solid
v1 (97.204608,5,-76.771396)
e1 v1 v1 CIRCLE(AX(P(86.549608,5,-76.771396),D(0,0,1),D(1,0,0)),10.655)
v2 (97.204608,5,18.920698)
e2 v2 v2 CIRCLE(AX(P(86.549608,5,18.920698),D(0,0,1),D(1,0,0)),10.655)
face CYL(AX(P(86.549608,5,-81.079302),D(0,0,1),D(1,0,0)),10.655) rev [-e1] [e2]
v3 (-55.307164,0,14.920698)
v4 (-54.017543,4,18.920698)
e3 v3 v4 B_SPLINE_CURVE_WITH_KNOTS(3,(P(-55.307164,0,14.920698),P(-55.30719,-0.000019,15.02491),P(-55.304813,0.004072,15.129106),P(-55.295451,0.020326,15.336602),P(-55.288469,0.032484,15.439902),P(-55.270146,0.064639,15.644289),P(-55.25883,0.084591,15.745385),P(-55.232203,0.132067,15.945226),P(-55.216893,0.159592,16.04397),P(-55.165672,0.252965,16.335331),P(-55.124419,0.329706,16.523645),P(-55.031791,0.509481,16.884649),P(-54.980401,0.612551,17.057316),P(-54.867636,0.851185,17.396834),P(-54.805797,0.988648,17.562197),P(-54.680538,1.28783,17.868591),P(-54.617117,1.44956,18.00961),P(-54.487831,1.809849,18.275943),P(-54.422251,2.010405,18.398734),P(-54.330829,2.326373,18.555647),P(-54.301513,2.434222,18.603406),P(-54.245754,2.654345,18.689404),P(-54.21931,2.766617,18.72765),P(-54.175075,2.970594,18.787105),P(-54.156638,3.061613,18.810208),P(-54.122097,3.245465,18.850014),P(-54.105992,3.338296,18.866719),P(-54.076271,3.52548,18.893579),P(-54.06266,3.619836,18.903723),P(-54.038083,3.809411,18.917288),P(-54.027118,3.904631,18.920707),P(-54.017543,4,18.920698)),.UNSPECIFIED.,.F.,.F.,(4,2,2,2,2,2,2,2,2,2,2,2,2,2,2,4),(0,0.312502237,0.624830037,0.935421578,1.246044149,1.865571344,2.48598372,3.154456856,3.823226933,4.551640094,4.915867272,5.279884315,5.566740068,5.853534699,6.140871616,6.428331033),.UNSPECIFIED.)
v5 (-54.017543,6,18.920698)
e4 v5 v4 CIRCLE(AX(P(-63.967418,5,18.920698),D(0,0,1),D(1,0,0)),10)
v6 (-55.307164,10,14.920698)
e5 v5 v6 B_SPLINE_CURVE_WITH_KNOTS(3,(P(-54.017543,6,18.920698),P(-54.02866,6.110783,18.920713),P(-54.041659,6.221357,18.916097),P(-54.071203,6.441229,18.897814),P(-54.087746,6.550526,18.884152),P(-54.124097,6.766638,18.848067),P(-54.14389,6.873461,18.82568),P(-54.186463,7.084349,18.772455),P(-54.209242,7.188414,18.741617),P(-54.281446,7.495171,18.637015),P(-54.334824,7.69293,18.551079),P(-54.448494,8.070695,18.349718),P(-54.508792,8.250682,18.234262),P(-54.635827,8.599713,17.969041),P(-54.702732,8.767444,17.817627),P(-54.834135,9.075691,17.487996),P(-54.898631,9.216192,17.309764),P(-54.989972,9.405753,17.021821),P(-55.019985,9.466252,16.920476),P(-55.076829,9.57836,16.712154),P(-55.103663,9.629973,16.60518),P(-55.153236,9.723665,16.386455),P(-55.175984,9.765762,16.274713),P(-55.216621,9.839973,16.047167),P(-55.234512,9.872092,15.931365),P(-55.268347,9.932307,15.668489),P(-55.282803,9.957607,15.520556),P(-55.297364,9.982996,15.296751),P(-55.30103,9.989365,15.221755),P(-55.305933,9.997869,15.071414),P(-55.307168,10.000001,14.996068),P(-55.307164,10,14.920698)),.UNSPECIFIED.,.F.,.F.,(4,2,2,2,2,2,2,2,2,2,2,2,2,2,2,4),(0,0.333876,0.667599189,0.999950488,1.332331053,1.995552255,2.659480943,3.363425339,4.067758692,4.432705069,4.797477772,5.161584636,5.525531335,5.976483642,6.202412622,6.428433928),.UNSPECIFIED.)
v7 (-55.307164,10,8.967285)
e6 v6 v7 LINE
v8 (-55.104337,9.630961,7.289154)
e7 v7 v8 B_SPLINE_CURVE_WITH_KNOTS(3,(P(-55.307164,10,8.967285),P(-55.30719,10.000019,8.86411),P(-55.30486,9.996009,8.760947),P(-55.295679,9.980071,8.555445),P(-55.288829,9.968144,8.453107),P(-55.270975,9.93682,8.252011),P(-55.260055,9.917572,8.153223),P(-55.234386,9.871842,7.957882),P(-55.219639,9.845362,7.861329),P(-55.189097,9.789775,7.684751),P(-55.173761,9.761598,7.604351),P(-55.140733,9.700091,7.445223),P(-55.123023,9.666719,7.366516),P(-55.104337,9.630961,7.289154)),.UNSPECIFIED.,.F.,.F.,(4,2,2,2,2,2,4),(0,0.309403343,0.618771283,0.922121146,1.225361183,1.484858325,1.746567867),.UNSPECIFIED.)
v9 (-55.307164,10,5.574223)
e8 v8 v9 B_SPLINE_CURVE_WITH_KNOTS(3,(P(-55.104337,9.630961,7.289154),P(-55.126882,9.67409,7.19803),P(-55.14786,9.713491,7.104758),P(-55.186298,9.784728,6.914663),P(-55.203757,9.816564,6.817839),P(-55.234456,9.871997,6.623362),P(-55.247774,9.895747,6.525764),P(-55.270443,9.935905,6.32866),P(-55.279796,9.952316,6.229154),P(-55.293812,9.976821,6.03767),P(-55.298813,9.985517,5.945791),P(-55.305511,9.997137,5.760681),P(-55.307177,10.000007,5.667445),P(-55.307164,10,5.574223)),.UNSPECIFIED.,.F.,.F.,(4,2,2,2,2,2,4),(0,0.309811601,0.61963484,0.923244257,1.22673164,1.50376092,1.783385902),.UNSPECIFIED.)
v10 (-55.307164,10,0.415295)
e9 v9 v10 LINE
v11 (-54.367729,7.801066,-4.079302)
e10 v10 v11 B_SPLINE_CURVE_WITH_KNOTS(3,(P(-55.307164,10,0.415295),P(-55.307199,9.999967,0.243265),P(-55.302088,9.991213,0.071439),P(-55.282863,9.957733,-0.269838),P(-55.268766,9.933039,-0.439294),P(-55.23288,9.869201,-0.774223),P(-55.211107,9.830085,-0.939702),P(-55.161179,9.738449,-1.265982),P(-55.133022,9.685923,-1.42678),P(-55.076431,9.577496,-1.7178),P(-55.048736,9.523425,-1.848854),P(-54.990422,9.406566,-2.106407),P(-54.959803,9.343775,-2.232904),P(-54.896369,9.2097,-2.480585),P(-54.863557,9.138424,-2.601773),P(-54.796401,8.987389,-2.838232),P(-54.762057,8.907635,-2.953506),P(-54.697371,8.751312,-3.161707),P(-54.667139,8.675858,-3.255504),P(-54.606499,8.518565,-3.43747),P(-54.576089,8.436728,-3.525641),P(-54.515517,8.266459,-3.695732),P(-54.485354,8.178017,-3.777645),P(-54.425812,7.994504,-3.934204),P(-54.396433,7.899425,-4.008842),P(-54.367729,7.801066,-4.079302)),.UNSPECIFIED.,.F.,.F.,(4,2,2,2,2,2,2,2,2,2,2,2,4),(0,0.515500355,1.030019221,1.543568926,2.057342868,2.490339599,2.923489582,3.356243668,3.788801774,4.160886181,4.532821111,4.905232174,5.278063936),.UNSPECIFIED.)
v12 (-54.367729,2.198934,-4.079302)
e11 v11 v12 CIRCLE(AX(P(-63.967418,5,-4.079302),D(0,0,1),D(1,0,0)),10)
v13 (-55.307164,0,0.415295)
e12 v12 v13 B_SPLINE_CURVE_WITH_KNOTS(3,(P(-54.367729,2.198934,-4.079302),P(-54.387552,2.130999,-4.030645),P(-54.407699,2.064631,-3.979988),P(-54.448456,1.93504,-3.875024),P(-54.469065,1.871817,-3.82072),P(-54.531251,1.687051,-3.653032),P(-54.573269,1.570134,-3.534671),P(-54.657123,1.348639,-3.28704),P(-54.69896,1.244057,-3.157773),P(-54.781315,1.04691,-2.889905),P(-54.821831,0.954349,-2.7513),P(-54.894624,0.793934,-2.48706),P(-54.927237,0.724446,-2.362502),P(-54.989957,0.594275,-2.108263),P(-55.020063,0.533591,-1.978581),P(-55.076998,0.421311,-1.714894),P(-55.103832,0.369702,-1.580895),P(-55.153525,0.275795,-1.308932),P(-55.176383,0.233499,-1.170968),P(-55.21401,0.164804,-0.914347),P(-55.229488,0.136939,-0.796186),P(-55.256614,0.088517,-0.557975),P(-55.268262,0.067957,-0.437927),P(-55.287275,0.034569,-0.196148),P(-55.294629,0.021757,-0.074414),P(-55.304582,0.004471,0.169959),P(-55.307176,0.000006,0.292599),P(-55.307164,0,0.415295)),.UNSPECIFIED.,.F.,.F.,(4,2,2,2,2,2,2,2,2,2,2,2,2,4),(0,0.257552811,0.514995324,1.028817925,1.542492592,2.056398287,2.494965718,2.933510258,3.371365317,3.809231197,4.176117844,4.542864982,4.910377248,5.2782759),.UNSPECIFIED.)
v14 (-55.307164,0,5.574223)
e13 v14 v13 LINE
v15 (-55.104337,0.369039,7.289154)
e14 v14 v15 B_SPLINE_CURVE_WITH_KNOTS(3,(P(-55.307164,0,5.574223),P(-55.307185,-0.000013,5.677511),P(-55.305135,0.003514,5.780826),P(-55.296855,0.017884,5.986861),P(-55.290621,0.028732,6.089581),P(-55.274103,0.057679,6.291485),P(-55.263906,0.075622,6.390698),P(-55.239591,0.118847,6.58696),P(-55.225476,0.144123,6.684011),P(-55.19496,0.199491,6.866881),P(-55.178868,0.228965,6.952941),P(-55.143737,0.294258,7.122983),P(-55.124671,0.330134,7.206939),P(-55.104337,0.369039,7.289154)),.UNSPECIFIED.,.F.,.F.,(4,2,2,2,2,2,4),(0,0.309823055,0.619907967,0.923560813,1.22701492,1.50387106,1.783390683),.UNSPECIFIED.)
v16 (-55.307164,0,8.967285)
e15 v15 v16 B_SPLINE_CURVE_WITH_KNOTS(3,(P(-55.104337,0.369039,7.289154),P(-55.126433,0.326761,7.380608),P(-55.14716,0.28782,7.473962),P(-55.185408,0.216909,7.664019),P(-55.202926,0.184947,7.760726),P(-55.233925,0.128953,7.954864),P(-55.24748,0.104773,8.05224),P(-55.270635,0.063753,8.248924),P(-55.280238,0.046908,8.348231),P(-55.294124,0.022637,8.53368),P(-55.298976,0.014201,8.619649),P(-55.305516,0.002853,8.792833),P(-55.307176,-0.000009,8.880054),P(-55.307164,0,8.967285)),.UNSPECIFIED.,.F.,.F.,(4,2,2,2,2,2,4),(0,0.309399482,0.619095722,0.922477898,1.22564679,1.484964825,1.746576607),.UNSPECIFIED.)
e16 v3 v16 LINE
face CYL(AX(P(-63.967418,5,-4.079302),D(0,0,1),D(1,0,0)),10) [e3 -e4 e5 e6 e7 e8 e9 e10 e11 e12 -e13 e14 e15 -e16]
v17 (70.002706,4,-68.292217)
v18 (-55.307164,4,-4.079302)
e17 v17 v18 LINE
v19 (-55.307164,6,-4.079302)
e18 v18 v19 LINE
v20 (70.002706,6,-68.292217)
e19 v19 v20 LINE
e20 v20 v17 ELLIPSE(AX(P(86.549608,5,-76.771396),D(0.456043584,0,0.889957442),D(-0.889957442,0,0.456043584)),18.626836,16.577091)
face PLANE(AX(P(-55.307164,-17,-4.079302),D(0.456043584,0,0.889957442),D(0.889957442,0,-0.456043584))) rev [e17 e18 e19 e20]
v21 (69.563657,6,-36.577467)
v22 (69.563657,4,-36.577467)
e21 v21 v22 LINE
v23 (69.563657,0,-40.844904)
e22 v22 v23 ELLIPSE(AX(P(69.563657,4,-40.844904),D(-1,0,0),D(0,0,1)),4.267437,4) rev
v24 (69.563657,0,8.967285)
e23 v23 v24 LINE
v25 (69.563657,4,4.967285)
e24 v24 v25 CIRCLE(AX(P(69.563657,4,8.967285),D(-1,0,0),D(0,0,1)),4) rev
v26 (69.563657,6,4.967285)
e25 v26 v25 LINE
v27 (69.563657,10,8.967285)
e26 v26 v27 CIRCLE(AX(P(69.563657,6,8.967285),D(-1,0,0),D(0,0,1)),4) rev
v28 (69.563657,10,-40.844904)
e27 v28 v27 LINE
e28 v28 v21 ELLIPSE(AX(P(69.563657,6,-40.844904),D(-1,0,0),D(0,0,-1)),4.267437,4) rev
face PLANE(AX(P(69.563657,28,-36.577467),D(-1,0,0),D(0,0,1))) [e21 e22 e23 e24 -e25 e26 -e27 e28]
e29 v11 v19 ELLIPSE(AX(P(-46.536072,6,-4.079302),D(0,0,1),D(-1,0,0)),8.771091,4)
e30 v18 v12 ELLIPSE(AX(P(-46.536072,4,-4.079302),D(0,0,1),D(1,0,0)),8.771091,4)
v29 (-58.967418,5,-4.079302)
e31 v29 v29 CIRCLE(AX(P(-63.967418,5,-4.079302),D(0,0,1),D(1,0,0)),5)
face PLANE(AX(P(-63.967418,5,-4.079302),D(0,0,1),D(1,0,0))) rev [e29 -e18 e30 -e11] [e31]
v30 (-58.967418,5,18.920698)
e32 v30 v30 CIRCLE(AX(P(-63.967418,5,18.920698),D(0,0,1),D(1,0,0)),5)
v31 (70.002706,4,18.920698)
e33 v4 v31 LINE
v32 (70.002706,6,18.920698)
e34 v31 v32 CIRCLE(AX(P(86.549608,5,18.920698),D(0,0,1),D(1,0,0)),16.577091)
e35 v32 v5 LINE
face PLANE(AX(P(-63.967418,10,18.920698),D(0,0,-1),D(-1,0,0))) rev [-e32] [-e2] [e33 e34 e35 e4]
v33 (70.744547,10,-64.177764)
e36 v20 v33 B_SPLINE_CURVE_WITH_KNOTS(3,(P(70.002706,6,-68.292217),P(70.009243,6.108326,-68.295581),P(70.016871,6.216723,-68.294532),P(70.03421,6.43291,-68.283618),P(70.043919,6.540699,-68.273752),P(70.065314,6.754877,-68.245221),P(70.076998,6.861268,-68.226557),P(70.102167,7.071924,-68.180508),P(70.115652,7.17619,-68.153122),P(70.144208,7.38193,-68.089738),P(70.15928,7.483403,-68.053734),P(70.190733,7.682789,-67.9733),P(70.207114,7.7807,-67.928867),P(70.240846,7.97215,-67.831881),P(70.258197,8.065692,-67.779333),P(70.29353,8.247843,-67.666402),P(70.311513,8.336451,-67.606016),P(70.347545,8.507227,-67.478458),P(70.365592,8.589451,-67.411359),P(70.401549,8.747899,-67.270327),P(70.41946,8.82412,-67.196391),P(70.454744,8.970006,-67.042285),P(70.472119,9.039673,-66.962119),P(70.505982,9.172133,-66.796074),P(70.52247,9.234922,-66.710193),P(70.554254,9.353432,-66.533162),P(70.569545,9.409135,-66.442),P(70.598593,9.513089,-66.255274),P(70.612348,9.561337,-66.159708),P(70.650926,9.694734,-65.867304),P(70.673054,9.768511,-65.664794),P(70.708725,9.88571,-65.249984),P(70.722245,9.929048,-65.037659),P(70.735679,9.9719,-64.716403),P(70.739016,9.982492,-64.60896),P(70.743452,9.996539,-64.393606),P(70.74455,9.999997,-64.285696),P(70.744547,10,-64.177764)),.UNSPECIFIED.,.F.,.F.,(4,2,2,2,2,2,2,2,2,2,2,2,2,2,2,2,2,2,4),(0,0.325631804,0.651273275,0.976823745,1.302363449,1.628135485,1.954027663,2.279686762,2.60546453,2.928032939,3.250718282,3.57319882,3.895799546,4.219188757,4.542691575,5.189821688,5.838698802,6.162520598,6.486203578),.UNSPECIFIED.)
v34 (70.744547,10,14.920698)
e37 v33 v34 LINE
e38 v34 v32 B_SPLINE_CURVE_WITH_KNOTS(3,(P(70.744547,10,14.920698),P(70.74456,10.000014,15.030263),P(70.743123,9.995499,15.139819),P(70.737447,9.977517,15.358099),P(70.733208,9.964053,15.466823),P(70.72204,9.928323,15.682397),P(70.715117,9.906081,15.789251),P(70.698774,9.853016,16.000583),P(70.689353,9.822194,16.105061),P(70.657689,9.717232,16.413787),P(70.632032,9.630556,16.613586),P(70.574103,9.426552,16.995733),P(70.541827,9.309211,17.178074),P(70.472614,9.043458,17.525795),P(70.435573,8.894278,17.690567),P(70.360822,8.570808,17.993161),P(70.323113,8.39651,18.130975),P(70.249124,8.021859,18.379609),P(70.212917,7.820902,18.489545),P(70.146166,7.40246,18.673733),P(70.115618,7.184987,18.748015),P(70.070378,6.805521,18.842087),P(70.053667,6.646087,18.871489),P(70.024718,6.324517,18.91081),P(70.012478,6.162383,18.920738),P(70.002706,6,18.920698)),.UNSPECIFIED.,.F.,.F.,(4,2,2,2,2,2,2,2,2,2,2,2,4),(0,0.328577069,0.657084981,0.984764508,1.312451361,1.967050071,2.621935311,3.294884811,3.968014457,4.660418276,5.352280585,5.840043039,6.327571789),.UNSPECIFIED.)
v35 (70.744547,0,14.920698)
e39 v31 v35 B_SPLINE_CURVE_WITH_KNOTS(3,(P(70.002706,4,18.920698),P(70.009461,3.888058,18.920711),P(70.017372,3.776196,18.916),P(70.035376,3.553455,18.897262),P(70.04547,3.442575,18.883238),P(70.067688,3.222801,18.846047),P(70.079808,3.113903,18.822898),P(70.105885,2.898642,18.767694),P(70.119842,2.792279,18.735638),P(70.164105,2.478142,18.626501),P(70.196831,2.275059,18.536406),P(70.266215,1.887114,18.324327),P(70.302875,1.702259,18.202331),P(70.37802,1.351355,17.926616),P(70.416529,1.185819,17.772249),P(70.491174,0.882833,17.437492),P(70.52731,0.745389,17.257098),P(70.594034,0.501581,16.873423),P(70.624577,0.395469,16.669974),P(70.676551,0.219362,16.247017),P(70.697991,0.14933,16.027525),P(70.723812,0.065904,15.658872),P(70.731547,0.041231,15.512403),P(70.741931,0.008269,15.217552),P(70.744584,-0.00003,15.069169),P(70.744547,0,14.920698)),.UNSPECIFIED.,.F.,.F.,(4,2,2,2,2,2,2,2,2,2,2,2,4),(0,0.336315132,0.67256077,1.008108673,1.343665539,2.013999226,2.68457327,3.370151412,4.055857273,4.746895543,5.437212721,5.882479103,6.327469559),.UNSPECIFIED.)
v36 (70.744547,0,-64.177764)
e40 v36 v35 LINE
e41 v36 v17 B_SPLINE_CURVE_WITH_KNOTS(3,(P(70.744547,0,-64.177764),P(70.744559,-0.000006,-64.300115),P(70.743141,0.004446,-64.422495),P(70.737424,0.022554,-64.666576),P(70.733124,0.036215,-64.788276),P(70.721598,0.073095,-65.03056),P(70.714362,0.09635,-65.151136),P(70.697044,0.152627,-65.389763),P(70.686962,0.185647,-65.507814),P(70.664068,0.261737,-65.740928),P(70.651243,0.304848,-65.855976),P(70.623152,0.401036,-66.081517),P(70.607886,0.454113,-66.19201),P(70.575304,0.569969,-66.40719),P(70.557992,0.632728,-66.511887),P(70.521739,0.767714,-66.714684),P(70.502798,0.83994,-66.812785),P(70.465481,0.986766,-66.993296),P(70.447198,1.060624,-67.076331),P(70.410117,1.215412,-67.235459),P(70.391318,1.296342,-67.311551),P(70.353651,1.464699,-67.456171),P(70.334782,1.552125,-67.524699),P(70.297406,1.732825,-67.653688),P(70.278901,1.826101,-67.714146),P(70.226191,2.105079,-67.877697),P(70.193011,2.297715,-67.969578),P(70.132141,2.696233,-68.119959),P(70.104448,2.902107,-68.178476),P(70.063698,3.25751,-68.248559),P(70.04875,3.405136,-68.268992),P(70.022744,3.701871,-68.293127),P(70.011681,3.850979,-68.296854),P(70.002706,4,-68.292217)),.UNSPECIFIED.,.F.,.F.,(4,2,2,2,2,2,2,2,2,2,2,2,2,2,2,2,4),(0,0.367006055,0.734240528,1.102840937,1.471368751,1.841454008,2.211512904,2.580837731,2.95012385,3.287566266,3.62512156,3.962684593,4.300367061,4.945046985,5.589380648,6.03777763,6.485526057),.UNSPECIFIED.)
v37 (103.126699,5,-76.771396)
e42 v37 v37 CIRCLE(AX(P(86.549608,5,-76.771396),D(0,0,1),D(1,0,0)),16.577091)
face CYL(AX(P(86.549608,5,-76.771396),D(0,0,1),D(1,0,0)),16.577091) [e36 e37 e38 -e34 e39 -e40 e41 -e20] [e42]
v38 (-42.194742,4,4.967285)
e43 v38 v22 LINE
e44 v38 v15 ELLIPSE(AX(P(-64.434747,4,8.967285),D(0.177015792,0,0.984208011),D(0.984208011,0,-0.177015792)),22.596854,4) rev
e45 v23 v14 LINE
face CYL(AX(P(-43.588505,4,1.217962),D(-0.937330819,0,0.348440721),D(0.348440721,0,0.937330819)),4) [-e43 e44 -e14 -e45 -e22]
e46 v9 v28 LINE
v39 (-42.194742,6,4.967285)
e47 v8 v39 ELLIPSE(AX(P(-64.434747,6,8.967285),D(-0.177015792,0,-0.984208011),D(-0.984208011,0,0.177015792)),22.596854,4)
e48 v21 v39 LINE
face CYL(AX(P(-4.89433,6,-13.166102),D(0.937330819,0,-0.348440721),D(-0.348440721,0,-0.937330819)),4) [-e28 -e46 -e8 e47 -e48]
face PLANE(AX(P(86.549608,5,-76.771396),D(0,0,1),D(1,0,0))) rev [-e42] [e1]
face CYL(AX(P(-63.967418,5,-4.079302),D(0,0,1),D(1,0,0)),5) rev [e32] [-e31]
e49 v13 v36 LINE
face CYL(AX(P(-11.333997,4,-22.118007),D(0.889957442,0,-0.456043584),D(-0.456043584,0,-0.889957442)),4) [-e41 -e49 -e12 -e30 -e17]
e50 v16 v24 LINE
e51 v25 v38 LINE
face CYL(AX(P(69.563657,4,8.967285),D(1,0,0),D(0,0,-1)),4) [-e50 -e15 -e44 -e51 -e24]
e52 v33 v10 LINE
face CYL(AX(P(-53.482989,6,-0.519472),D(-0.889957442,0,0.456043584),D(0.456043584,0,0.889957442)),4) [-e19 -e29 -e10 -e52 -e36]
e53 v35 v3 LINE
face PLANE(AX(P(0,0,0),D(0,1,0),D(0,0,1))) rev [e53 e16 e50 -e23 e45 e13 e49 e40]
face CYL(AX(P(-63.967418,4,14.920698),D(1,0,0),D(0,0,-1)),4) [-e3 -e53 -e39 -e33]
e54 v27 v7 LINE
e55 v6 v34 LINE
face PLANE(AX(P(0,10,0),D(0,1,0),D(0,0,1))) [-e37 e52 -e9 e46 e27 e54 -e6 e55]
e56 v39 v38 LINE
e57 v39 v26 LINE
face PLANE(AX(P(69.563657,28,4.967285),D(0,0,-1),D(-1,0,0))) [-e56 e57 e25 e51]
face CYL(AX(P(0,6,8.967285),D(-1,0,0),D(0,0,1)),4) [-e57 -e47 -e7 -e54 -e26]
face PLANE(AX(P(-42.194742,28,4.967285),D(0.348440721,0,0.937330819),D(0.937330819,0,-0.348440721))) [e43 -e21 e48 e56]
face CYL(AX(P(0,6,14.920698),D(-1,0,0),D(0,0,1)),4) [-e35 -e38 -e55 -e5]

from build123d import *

# Parameters (mm, degrees)
BOSS_EXTRUDE1_DEPTH     = 10
SKETCH2_R               = 10
SKETCH2_R_2             = 5
BOSS_EXTRUDE2_DEPTH     = 23
SKETCH3_R               = 5
CUT_EXTRUDE1_DEPTH      = 27
CUT_EXTRUDE2_DEPTH      = 27
SKETCH5_R               = 16.577091043
SKETCH5_R_2             = 9.5
BOSS_EXTRUDE3_DEPTH     = 95.692095
SKETCH6_R               = 10.655
CUT_EXTRUDE3_DEPTH      = 100
CUT_EXTRUDE4_DEPTH      = 18
CUT_EXTRUDE4_DEPTH_BACK = 49
FILLET1_R               = 4


with BuildPart() as part:
    # Sketch1 → Boss-Extrude1 (new body)
    with BuildSketch(Plane(origin=(0, 0, 0), x_dir=(1, 0, 0), z_dir=(0, 1, 0))):
        Polygon((-63.967417751, -18.920698467), (86.549607935, -18.920698467), (86.549607935, 76.771396129), (-63.967417751, 4.079301533), align=None)
    extrude(amount=BOSS_EXTRUDE1_DEPTH)

    # Sketch2 → Boss-Extrude2 (add)
    with BuildSketch(Plane.XY.offset(18.920698467)):
        with Locations((-63.967417751, 5)):
            Circle(SKETCH2_R)
        with Locations((-63.967417751, 5)):
            Circle(SKETCH2_R_2, mode=Mode.SUBTRACT)
    extrude(amount=-BOSS_EXTRUDE2_DEPTH)

    # Sketch3 → Cut-Extrude1 (cut)
    with BuildSketch(Plane.XY.offset(18.920698467)):
        with Locations((-63.967417751, 5)):
            Circle(SKETCH3_R)
    extrude(amount=-CUT_EXTRUDE1_DEPTH, mode=Mode.SUBTRACT)

    # Sketch4 → Cut-Extrude2 (cut)
    with BuildSketch(Plane(origin=(0, 10, 0), x_dir=(1, 0, 0), z_dir=(0, 1, 0))):
        Polygon((-63.967417751, 4.079301533), (-55.307163713, 4.079301533), (86.549607935, 76.771396129), align=None)
    extrude(amount=-CUT_EXTRUDE2_DEPTH, mode=Mode.SUBTRACT)

    # Sketch5 → Boss-Extrude3 (add)
    with BuildSketch(Plane.XY.offset(18.920698467)):
        with Locations((86.549607935, 5)):
            Circle(SKETCH5_R)
        with Locations((86.549607935, 5)):
            Circle(SKETCH5_R_2, mode=Mode.SUBTRACT)
    extrude(amount=-BOSS_EXTRUDE3_DEPTH)

    # Sketch6 → Cut-Extrude3 (cut)
    with BuildSketch(Plane.XY.offset(18.920698467)):
        with Locations((86.549607935, 5)):
            Circle(SKETCH6_R)
    extrude(amount=-CUT_EXTRUDE3_DEPTH, mode=Mode.SUBTRACT)

    # Sketch7 → Cut-Extrude4 (cut, two sides: drawn at the far end of the back side and taken through both)
    with BuildSketch(Plane(origin=(0, 10, 0), x_dir=(1, 0, 0), z_dir=(0, 1, 0)).offset(-CUT_EXTRUDE4_DEPTH_BACK)):
        Polygon((-42.194742499, -4.96728533), (69.563656526, 36.57746749), (69.563656526, -4.96728533), align=None)
    extrude(amount=CUT_EXTRUDE4_DEPTH + CUT_EXTRUDE4_DEPTH_BACK, mode=Mode.SUBTRACT)

    # Fillet1
    # the kernel refuses this fillet: 4 mm, written as the material it takes off along each edge
    with BuildSketch(Plane(origin=(-64.206738138, 0, 0.481134309), x_dir=(0.45604358422436925, 0, 0.8899574424026075), z_dir=(0.8899574424026077, 0, -0.45604358422436925))) as fillet1_piece_1_section:
        with BuildLine():
            CenterArc((FILLET1_R, -FILLET1_R), FILLET1_R, 90, 90)
            Line((0, -FILLET1_R), (0, 0))
            Line((0, 0), (FILLET1_R, 0))
        make_face()
    fillet1_piece_1 = extrude(amount=161.63790854, mode=Mode.PRIVATE)
    fillet1_piece_1 = fillet1_piece_1 & Plane(origin=(-63.967417751, 5, 0.481134309), x_dir=(1, 0, 0), z_dir=(0, 0, 1)) * Cylinder(10, 340, mode=Mode.PRIVATE)
    fillet1_piece_1 = split(fillet1_piece_1, bisect_by=Plane(origin=(-64.206738138, 0, -4.079301533), z_dir=(0, 0, -1)), keep=Keep.TOP, mode=Mode.PRIVATE)
    add(fillet1_piece_1, mode=Mode.SUBTRACT)
    with BuildSketch(Plane(origin=(-64.206738138, 0, 0.481134309), x_dir=(0.45604358422436925, 0, 0.8899574424026075), z_dir=(0.8899574424026077, 0, -0.45604358422436925))) as fillet1_piece_2_section:
        with BuildLine():
            CenterArc((FILLET1_R, -FILLET1_R), FILLET1_R, 90, 90)
            Line((0, -FILLET1_R), (0, 0))
            Line((0, 0), (FILLET1_R, 0))
        make_face()
    fillet1_piece_2 = extrude(amount=161.63790854, mode=Mode.PRIVATE)
    fillet1_piece_2 = fillet1_piece_2 - Plane(origin=(-63.967417751, 5, 0.481134309), x_dir=(1, 0, 0), z_dir=(0, 0, 1)) * Cylinder(10, 340, mode=Mode.PRIVATE)
    fillet1_piece_2 = split(fillet1_piece_2, bisect_by=Plane(origin=(-64.206738138, 0, -4.079301533), z_dir=(0, 0, 1)), keep=Keep.TOP, mode=Mode.PRIVATE)
    add(fillet1_piece_2, mode=Mode.SUBTRACT)
    with BuildSketch(Plane(origin=(-64.206738138, 0, 0.481134309), x_dir=(0.45604358422436925, 0, 0.8899574424026075), z_dir=(0.8899574424026077, 0, -0.45604358422436925))) as fillet1_piece_3_section:
        with BuildLine():
            CenterArc((FILLET1_R, -FILLET1_R), FILLET1_R, 90, 90)
            Line((0, -FILLET1_R), (0, 0))
            Line((0, 0), (FILLET1_R, 0))
        make_face()
    fillet1_piece_3 = extrude(amount=161.63790854, mode=Mode.PRIVATE)
    fillet1_piece_3 = fillet1_piece_3 - Plane(origin=(-63.967417751, 5, 0.481134309), x_dir=(1, 0, 0), z_dir=(0, 0, 1)) * Cylinder(10, 340, mode=Mode.PRIVATE)
    fillet1_piece_3 = fillet1_piece_3 - Plane(origin=(86.549607935, 5, 0.481134309), x_dir=(1, 0, 0), z_dir=(0, 0, 1)) * Cylinder(16.577091043, 340, mode=Mode.PRIVATE)
    fillet1_piece_3 = split(fillet1_piece_3, bisect_by=Plane(origin=(-64.206738138, 0, -4.079301533), z_dir=(0, 0, -1)), keep=Keep.TOP, mode=Mode.PRIVATE)
    add(fillet1_piece_3, mode=Mode.SUBTRACT)
    with BuildSketch(Plane(origin=(-64.206738138, 10, 0.481134309), x_dir=(0.45604358422436925, 0, 0.8899574424026077), z_dir=(0.8899574424026077, 0, -0.45604358422436925))) as fillet1_piece_4_section:
        with BuildLine():
            CenterArc((FILLET1_R, FILLET1_R), FILLET1_R, 180, 90)
            Line((0, FILLET1_R), (0, 0))
            Line((0, 0), (FILLET1_R, 0))
        make_face()
    fillet1_piece_4 = extrude(amount=161.63790854, mode=Mode.PRIVATE)
    fillet1_piece_4 = fillet1_piece_4 & Plane(origin=(-63.967417751, 5, 0.481134309), x_dir=(1, 0, 0), z_dir=(0, 0, 1)) * Cylinder(10, 340, mode=Mode.PRIVATE)
    fillet1_piece_4 = split(fillet1_piece_4, bisect_by=Plane(origin=(-64.206738138, 10, -4.079301533), z_dir=(0, 0, -1)), keep=Keep.TOP, mode=Mode.PRIVATE)
    add(fillet1_piece_4, mode=Mode.SUBTRACT)
    with BuildSketch(Plane(origin=(-64.206738138, 10, 0.481134309), x_dir=(0.45604358422436925, 0, 0.8899574424026077), z_dir=(0.8899574424026077, 0, -0.45604358422436925))) as fillet1_piece_5_section:
        with BuildLine():
            CenterArc((FILLET1_R, FILLET1_R), FILLET1_R, 180, 90)
            Line((0, FILLET1_R), (0, 0))
            Line((0, 0), (FILLET1_R, 0))
        make_face()
    fillet1_piece_5 = extrude(amount=161.63790854, mode=Mode.PRIVATE)
    fillet1_piece_5 = fillet1_piece_5 - Plane(origin=(-63.967417751, 5, 0.481134309), x_dir=(1, 0, 0), z_dir=(0, 0, 1)) * Cylinder(10, 340, mode=Mode.PRIVATE)
    fillet1_piece_5 = split(fillet1_piece_5, bisect_by=Plane(origin=(-64.206738138, 10, -4.079301533), z_dir=(0, 0, 1)), keep=Keep.TOP, mode=Mode.PRIVATE)
    add(fillet1_piece_5, mode=Mode.SUBTRACT)
    with BuildSketch(Plane(origin=(-64.206738138, 10, 0.481134309), x_dir=(0.45604358422436925, 0, 0.8899574424026077), z_dir=(0.8899574424026077, 0, -0.45604358422436925))) as fillet1_piece_6_section:
        with BuildLine():
            CenterArc((FILLET1_R, FILLET1_R), FILLET1_R, 180, 90)
            Line((0, FILLET1_R), (0, 0))
            Line((0, 0), (FILLET1_R, 0))
        make_face()
    fillet1_piece_6 = extrude(amount=161.63790854, mode=Mode.PRIVATE)
    fillet1_piece_6 = fillet1_piece_6 - Plane(origin=(-63.967417751, 5, 0.481134309), x_dir=(1, 0, 0), z_dir=(0, 0, 1)) * Cylinder(10, 340, mode=Mode.PRIVATE)
    fillet1_piece_6 = fillet1_piece_6 - Plane(origin=(86.549607935, 5, 0.481134309), x_dir=(1, 0, 0), z_dir=(0, 0, 1)) * Cylinder(16.577091043, 340, mode=Mode.PRIVATE)
    fillet1_piece_6 = split(fillet1_piece_6, bisect_by=Plane(origin=(-64.206738138, 10, -4.079301533), z_dir=(0, 0, -1)), keep=Keep.TOP, mode=Mode.PRIVATE)
    add(fillet1_piece_6, mode=Mode.SUBTRACT)
    with BuildSketch(Plane(origin=(78.936964713, 0, -40.061874704), x_dir=(-0.34844072135662324, 0, -0.9373308187083554), z_dir=(-0.9373308187083556, 0, 0.34844072135662324))) as fillet1_piece_7_section:
        with BuildLine():
            CenterArc((FILLET1_R, -FILLET1_R), FILLET1_R, 90, 90)
            Line((0, -FILLET1_R), (0, 0))
            Line((0, 0), (FILLET1_R, 0))
        make_face()
    fillet1_piece_7 = extrude(amount=146.230475297, mode=Mode.PRIVATE)
    fillet1_piece_7 = split(fillet1_piece_7, bisect_by=Plane(origin=(78.936964713, 0, 4.96728533), z_dir=(0, 0, -1)), keep=Keep.TOP, mode=Mode.PRIVATE)
    fillet1_piece_7 = split(fillet1_piece_7, bisect_by=Plane(origin=(69.563656526, 0, -40.061874704), z_dir=(-1, 0, 0)), keep=Keep.TOP, mode=Mode.PRIVATE)
    add(fillet1_piece_7, mode=Mode.SUBTRACT)
    with BuildSketch(Plane(origin=(78.936964713, 10, -40.061874704), x_dir=(-0.34844072135662324, 0, -0.9373308187083554), z_dir=(-0.9373308187083556, 0, 0.34844072135662324))) as fillet1_piece_8_section:
        with BuildLine():
            CenterArc((FILLET1_R, FILLET1_R), FILLET1_R, 180, 90)
            Line((0, FILLET1_R), (0, 0))
            Line((0, 0), (FILLET1_R, 0))
        make_face()
    fillet1_piece_8 = extrude(amount=146.230475297, mode=Mode.PRIVATE)
    fillet1_piece_8 = split(fillet1_piece_8, bisect_by=Plane(origin=(78.936964713, 10, 4.96728533), z_dir=(0, 0, -1)), keep=Keep.TOP, mode=Mode.PRIVATE)
    fillet1_piece_8 = split(fillet1_piece_8, bisect_by=Plane(origin=(69.563656526, 10, -40.061874704), z_dir=(-1, 0, 0)), keep=Keep.TOP, mode=Mode.PRIVATE)
    add(fillet1_piece_8, mode=Mode.SUBTRACT)
    with BuildSketch(Plane(origin=(-59.194742499, 0, 4.96728533), x_dir=(0, 0, 1), z_dir=(1, 0, 0))) as fillet1_piece_9_section:
        with BuildLine():
            CenterArc((FILLET1_R, -FILLET1_R), FILLET1_R, 90, 90)
            Line((0, -FILLET1_R), (0, 0))
            Line((0, 0), (FILLET1_R, 0))
        make_face()
    fillet1_piece_9 = extrude(amount=128.758399025, mode=Mode.PRIVATE)
    fillet1_piece_9 = split(fillet1_piece_9, bisect_by=Plane(origin=(-57.130756582, 0, 10.519557182), z_dir=(0.34844072135662324, 0, 0.9373308187083556)), keep=Keep.TOP, mode=Mode.PRIVATE)
    add(fillet1_piece_9, mode=Mode.SUBTRACT)
    with BuildSketch(Plane(origin=(-59.194742499, 10, 4.96728533), x_dir=(0, 0, 1), z_dir=(1, 0, 0))) as fillet1_piece_10_section:
        with BuildLine():
            CenterArc((FILLET1_R, FILLET1_R), FILLET1_R, 180, 90)
            Line((0, FILLET1_R), (0, 0))
            Line((0, 0), (FILLET1_R, 0))
        make_face()
    fillet1_piece_10 = extrude(amount=128.758399025, mode=Mode.PRIVATE)
    fillet1_piece_10 = split(fillet1_piece_10, bisect_by=Plane(origin=(-57.130756582, 10, 10.519557182), z_dir=(0.34844072135662324, 0, 0.9373308187083556)), keep=Keep.TOP, mode=Mode.PRIVATE)
    add(fillet1_piece_10, mode=Mode.SUBTRACT)
    with BuildSketch(Plane(origin=(-65.307163713, 0, 18.920698467), x_dir=(0, 1, 0), z_dir=(1, 0, 0))) as fillet1_piece_11_section:
        with BuildLine():
            CenterArc((FILLET1_R, -FILLET1_R), FILLET1_R, 90, 90)
            Line((0, -FILLET1_R), (0, 0))
            Line((0, 0), (FILLET1_R, 0))
        make_face()
    fillet1_piece_11 = extrude(amount=146.051710831, mode=Mode.PRIVATE)
    fillet1_piece_11 = fillet1_piece_11 - Plane(origin=(-63.967417751, 5, 18.920698467), x_dir=(1, 0, 0), z_dir=(0, 0, 1)) * Cylinder(10, 309, mode=Mode.PRIVATE)
    fillet1_piece_11 = fillet1_piece_11 - Plane(origin=(86.549607935, 5, 18.920698467), x_dir=(1, 0, 0), z_dir=(0, 0, 1)) * Cylinder(16.577091043, 309, mode=Mode.PRIVATE)
    add(fillet1_piece_11, mode=Mode.SUBTRACT)
    with BuildSketch(Plane(origin=(-65.307163713, 10, 18.920698467), x_dir=(0, -1, 0), z_dir=(1, 0, 0))) as fillet1_piece_12_section:
        with BuildLine():
            CenterArc((FILLET1_R, FILLET1_R), FILLET1_R, 180, 90)
            Line((0, FILLET1_R), (0, 0))
            Line((0, 0), (FILLET1_R, 0))
        make_face()
    fillet1_piece_12 = extrude(amount=146.051710831, mode=Mode.PRIVATE)
    fillet1_piece_12 = fillet1_piece_12 - Plane(origin=(-63.967417751, 5, 18.920698467), x_dir=(1, 0, 0), z_dir=(0, 0, 1)) * Cylinder(10, 309, mode=Mode.PRIVATE)
    fillet1_piece_12 = fillet1_piece_12 - Plane(origin=(86.549607935, 5, 18.920698467), x_dir=(1, 0, 0), z_dir=(0, 0, 1)) * Cylinder(16.577091043, 309, mode=Mode.PRIVATE)
    add(fillet1_piece_12, mode=Mode.SUBTRACT)
    with BuildSketch(Plane(origin=(78.936964713, 0, -40.061874704), x_dir=(-0.34844072135662324, 0, -0.9373308187083554), z_dir=(-0.9373308187083556, 0, 0.34844072135662324))) as fillet1_piece_13a_section:
        with BuildLine():
            CenterArc((FILLET1_R, -FILLET1_R), FILLET1_R, 90, 90)
            Line((0, -FILLET1_R), (0, 0))
            Line((0, 0), (FILLET1_R, 0))
        make_face()
    fillet1_piece_13a = extrude(amount=146.230475297, mode=Mode.PRIVATE)
    fillet1_piece_13a = fillet1_piece_13a - Plane(origin=(-63.967417751, 5, -40.061874704), x_dir=(1, 0, 0), z_dir=(0, 0, 1)) * Cylinder(10, 309, mode=Mode.PRIVATE)
    fillet1_piece_13a = split(fillet1_piece_13a, bisect_by=Plane(origin=(78.936964713, 0, 4.96728533), z_dir=(0, 0, 1)), keep=Keep.TOP, mode=Mode.PRIVATE)
    with BuildSketch(Plane(origin=(-59.194742499, 0, 4.96728533), x_dir=(0, 0, 1), z_dir=(1, 0, 0))) as fillet1_piece_13b_section:
        with BuildLine():
            CenterArc((FILLET1_R, -FILLET1_R), FILLET1_R, 90, 90)
            Line((0, -FILLET1_R), (0, 0))
            Line((0, 0), (FILLET1_R, 0))
        make_face()
    fillet1_piece_13b = extrude(amount=128.758399025, mode=Mode.PRIVATE)
    fillet1_piece_13b = fillet1_piece_13b - Plane(origin=(-63.967417751, 5, 4.96728533), x_dir=(1, 0, 0), z_dir=(0, 0, 1)) * Cylinder(10, 274, mode=Mode.PRIVATE)
    fillet1_piece_13b = split(fillet1_piece_13b, bisect_by=Plane(origin=(-57.130756582, 0, 10.519557182), z_dir=(-0.34844072135662324, 0, -0.9373308187083556)), keep=Keep.TOP, mode=Mode.PRIVATE)
    fillet1_piece_13 = fillet1_piece_13a & fillet1_piece_13b
    add(fillet1_piece_13, mode=Mode.SUBTRACT)
    with BuildSketch(Plane(origin=(78.936964713, 10, -40.061874704), x_dir=(-0.34844072135662324, 0, -0.9373308187083554), z_dir=(-0.9373308187083556, 0, 0.34844072135662324))) as fillet1_piece_14a_section:
        with BuildLine():
            CenterArc((FILLET1_R, FILLET1_R), FILLET1_R, 180, 90)
            Line((0, FILLET1_R), (0, 0))
            Line((0, 0), (FILLET1_R, 0))
        make_face()
    fillet1_piece_14a = extrude(amount=146.230475297, mode=Mode.PRIVATE)
    fillet1_piece_14a = fillet1_piece_14a - Plane(origin=(-63.967417751, 5, -40.061874704), x_dir=(1, 0, 0), z_dir=(0, 0, 1)) * Cylinder(10, 309, mode=Mode.PRIVATE)
    fillet1_piece_14a = split(fillet1_piece_14a, bisect_by=Plane(origin=(78.936964713, 10, 4.96728533), z_dir=(0, 0, 1)), keep=Keep.TOP, mode=Mode.PRIVATE)
    with BuildSketch(Plane(origin=(-59.194742499, 10, 4.96728533), x_dir=(0, 0, 1), z_dir=(1, 0, 0))) as fillet1_piece_14b_section:
        with BuildLine():
            CenterArc((FILLET1_R, FILLET1_R), FILLET1_R, 180, 90)
            Line((0, FILLET1_R), (0, 0))
            Line((0, 0), (FILLET1_R, 0))
        make_face()
    fillet1_piece_14b = extrude(amount=128.758399025, mode=Mode.PRIVATE)
    fillet1_piece_14b = fillet1_piece_14b - Plane(origin=(-63.967417751, 5, 4.96728533), x_dir=(1, 0, 0), z_dir=(0, 0, 1)) * Cylinder(10, 274, mode=Mode.PRIVATE)
    fillet1_piece_14b = split(fillet1_piece_14b, bisect_by=Plane(origin=(-57.130756582, 10, 10.519557182), z_dir=(-0.34844072135662324, 0, -0.9373308187083556)), keep=Keep.TOP, mode=Mode.PRIVATE)
    fillet1_piece_14 = fillet1_piece_14a & fillet1_piece_14b
    add(fillet1_piece_14, mode=Mode.SUBTRACT)


solid = part.part
